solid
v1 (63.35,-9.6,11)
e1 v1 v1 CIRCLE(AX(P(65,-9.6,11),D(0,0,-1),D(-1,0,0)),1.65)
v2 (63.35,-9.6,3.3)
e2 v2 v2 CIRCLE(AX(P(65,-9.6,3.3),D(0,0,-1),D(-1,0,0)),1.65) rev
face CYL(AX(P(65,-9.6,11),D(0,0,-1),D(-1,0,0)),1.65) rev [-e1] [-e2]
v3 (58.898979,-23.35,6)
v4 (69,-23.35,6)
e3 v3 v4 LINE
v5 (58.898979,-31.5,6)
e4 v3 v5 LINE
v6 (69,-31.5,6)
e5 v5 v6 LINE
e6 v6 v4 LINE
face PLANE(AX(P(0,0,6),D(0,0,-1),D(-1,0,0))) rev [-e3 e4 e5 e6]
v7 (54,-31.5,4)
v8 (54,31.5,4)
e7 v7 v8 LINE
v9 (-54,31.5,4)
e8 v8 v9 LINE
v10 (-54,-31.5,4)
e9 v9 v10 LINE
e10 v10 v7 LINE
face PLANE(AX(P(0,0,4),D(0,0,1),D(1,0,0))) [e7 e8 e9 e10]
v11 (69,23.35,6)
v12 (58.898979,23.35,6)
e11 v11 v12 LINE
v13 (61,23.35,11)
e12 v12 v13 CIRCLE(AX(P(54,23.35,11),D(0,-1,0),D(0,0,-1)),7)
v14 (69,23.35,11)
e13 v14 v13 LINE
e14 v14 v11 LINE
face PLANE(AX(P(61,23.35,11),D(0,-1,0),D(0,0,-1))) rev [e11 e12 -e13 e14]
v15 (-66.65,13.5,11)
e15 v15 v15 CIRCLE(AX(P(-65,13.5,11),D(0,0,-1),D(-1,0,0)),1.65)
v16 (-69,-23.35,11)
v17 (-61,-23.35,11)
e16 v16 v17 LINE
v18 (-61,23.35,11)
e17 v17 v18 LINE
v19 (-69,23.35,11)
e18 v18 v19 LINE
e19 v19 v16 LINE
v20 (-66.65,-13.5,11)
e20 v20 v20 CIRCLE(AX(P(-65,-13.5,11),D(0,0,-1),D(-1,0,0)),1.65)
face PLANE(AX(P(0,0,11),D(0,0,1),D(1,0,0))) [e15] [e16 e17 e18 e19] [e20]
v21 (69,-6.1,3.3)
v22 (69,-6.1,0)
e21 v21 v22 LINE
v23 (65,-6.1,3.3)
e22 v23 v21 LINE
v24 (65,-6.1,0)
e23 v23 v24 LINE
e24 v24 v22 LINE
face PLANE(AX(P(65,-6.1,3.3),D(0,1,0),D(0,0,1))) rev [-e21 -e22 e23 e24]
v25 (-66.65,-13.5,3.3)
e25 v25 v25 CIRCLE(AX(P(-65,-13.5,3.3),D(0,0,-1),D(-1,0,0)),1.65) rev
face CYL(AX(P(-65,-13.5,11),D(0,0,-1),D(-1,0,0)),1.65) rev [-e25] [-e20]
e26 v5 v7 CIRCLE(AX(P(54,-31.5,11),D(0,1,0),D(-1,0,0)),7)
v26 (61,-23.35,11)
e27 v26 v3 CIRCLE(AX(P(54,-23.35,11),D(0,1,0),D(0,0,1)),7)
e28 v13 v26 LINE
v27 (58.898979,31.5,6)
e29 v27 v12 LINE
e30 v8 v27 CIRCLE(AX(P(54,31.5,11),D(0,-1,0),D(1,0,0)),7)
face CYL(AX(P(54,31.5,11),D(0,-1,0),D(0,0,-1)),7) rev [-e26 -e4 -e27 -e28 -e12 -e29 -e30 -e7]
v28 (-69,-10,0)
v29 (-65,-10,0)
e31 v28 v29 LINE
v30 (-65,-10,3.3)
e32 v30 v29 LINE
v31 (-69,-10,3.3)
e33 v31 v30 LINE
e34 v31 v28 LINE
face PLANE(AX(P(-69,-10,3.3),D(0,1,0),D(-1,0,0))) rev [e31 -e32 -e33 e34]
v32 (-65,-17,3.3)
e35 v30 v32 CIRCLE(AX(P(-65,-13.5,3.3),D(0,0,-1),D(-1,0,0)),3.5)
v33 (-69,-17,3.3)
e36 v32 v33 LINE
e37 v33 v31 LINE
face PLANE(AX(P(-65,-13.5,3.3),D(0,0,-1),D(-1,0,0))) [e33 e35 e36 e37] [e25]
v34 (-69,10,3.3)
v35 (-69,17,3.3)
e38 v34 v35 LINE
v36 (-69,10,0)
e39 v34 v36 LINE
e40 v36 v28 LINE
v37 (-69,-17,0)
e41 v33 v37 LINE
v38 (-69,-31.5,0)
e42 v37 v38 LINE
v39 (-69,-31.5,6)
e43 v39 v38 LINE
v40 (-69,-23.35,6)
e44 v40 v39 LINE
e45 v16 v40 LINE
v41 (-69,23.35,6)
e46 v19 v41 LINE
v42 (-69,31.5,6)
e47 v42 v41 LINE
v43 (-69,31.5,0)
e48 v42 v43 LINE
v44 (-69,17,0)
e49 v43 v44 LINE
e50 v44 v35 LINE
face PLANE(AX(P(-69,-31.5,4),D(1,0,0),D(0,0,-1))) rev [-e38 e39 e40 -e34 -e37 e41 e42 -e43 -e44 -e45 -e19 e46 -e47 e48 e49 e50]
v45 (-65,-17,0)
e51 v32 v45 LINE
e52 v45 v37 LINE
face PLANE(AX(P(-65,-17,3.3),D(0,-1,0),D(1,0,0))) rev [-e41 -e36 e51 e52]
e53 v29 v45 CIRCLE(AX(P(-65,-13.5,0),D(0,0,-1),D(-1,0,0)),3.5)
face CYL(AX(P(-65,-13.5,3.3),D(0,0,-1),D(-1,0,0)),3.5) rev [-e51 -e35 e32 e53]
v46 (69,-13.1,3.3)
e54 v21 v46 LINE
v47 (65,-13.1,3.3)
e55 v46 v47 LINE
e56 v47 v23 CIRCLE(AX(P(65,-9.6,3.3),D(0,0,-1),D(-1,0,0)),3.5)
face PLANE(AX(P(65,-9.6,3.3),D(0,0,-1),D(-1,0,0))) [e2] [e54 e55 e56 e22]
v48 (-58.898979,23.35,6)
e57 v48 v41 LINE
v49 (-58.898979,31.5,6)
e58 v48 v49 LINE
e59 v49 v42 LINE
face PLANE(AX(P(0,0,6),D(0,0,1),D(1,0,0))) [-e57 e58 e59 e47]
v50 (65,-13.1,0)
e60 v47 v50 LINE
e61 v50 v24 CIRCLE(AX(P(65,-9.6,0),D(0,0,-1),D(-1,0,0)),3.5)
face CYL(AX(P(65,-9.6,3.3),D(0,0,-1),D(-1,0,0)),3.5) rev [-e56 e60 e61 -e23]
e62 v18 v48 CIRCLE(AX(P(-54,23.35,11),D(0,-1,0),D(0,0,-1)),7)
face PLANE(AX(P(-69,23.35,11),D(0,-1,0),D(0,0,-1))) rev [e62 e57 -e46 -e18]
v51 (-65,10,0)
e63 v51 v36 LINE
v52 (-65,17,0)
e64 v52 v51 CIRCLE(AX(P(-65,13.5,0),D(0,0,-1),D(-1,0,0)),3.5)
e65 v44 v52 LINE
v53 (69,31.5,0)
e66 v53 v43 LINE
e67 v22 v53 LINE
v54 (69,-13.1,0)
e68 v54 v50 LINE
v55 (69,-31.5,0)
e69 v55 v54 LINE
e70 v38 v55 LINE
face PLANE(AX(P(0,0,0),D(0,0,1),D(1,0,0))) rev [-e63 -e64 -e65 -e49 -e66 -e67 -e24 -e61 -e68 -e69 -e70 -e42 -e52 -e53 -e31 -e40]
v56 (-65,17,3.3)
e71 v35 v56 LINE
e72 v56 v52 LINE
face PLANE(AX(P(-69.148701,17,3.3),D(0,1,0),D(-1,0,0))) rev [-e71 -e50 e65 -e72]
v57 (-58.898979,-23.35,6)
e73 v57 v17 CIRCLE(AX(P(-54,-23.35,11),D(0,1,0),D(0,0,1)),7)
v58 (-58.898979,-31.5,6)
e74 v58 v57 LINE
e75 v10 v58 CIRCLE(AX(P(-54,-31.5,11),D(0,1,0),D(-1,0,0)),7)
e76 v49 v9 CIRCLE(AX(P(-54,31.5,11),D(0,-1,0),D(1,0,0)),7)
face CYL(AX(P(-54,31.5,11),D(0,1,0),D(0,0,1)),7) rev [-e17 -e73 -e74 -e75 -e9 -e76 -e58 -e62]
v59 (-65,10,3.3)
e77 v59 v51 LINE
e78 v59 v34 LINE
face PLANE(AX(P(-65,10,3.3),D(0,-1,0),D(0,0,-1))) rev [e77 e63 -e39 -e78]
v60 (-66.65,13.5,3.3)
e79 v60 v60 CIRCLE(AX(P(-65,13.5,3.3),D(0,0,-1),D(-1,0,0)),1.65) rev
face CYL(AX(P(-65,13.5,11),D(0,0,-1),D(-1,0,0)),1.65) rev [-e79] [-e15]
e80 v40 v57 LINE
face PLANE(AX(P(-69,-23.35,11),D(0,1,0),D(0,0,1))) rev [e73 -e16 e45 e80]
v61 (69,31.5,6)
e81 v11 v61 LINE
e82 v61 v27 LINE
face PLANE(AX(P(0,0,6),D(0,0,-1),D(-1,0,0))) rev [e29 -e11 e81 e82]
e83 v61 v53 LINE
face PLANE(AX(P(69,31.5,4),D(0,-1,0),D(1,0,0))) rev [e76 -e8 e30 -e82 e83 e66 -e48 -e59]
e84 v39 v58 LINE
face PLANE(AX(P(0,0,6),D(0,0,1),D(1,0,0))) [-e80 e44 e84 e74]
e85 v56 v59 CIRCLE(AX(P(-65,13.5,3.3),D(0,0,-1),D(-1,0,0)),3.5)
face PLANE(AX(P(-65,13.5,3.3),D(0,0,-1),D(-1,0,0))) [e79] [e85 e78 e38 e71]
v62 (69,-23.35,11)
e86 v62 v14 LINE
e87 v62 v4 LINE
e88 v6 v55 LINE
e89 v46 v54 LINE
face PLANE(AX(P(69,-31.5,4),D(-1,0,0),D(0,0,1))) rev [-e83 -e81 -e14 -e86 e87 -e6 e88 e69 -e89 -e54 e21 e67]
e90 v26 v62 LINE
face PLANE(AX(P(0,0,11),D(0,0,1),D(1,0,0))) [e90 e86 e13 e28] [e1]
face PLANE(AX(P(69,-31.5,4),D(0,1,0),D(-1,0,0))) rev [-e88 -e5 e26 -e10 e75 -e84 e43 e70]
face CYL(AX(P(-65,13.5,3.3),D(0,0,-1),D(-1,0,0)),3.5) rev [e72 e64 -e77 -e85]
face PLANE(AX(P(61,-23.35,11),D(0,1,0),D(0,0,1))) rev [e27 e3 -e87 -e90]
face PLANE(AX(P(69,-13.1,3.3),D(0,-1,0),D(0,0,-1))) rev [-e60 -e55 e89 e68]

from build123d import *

# Parameters (mm, degrees)
ESBO_O1_W                = 138
ESBO_O1_H                = 63
RESSALTO_EXTRUS_O1_DEPTH = 4
ESBO_O2_W                = 8
ESBO_O2_H                = 63
RESSALTO_EXTRUS_O2_DEPTH = 2
ESBO_O3_W                = 8
ESBO_O3_H                = 46.7
RESSALTO_EXTRUS_O3_DEPTH = 5
ESBO_O4_R                = 1.65
CORTE_EXTRUS_O1_DEPTH    = 77.643655967
CORTE_EXTRUS_O2_DEPTH    = 3.3
FILETE1_R                = 7


with BuildPart() as part:
    # Esboço1 → Ressalto-extrusão1 (new body)
    with BuildSketch(Plane.XY):
        Rectangle(ESBO_O1_W, ESBO_O1_H)
    extrude(amount=RESSALTO_EXTRUS_O1_DEPTH)

    # Esboço2 → Ressalto-extrusão2 (add)
    with BuildSketch(Plane.XY.offset(4)):
        with Locations((65, 0)):
            Rectangle(ESBO_O2_W, ESBO_O2_H)
        with Locations((-65, 0)):
            Rectangle(ESBO_O2_W, ESBO_O2_H)
    extrude(amount=RESSALTO_EXTRUS_O2_DEPTH)

    # Esboço3 → Ressalto-extrusão3 (add)
    with BuildSketch(Plane.XY.offset(6)):
        with Locations((65, 0)):
            Rectangle(ESBO_O3_W, ESBO_O3_H)
        with Locations((-65, 0)):
            Rectangle(ESBO_O3_W, ESBO_O3_H)
    extrude(amount=RESSALTO_EXTRUS_O3_DEPTH)

    # Esboço4 → Corte-extrusão1 (cut, through all)
    with BuildSketch(Plane(origin=(0, 0, 0), x_dir=(-1, 0, 0), z_dir=(0, 0, -1))):
        with Locations((65, -13.5)):
            Circle(ESBO_O4_R)
        with Locations((65, 13.5)):
            Circle(ESBO_O4_R)
        with Locations((-65, -9.6)):
            Circle(ESBO_O4_R)
    extrude(amount=-CORTE_EXTRUS_O1_DEPTH, mode=Mode.SUBTRACT)

    # Esboço5 → Corte-extrusão2 (cut)
    with BuildSketch(Plane(origin=(0, 0, 0), x_dir=(-1, 0, 0), z_dir=(0, 0, -1))):
        with BuildLine():
            Line((65, -17), (69, -17))
            Line((69, -17), (69, -10))
            Line((69, -10), (65, -10))
            ThreePointArc((65, -10), (61.5, -13.5), (65, -17))
        make_face()
        with BuildLine():
            Line((65, 10), (69, 10))
            Line((69, 10), (69.148700963, 17))
            Line((69.148700963, 17), (65, 17))
            ThreePointArc((65, 17), (61.5, 13.5), (65, 10))
        make_face()
        with BuildLine():
            Line((-65, -6.1), (-69, -6.1))
            Line((-69, -6.1), (-69, -13.1))
            Line((-69, -13.1), (-65, -13.1))
            ThreePointArc((-65, -13.1), (-61.5, -9.6), (-65, -6.1))
        make_face()
    extrude(amount=-CORTE_EXTRUS_O2_DEPTH, mode=Mode.SUBTRACT)

    # Filete1
    filete1_edges = [part.edges().sort_by_distance(p)[0] for p in [
        (61, 0, 4),
        (-61, 0, 4),
    ]]
    fillet(filete1_edges, radius=FILETE1_R - 0.0001)  # a hair under: the kernel refuses the full size


solid = part.part
